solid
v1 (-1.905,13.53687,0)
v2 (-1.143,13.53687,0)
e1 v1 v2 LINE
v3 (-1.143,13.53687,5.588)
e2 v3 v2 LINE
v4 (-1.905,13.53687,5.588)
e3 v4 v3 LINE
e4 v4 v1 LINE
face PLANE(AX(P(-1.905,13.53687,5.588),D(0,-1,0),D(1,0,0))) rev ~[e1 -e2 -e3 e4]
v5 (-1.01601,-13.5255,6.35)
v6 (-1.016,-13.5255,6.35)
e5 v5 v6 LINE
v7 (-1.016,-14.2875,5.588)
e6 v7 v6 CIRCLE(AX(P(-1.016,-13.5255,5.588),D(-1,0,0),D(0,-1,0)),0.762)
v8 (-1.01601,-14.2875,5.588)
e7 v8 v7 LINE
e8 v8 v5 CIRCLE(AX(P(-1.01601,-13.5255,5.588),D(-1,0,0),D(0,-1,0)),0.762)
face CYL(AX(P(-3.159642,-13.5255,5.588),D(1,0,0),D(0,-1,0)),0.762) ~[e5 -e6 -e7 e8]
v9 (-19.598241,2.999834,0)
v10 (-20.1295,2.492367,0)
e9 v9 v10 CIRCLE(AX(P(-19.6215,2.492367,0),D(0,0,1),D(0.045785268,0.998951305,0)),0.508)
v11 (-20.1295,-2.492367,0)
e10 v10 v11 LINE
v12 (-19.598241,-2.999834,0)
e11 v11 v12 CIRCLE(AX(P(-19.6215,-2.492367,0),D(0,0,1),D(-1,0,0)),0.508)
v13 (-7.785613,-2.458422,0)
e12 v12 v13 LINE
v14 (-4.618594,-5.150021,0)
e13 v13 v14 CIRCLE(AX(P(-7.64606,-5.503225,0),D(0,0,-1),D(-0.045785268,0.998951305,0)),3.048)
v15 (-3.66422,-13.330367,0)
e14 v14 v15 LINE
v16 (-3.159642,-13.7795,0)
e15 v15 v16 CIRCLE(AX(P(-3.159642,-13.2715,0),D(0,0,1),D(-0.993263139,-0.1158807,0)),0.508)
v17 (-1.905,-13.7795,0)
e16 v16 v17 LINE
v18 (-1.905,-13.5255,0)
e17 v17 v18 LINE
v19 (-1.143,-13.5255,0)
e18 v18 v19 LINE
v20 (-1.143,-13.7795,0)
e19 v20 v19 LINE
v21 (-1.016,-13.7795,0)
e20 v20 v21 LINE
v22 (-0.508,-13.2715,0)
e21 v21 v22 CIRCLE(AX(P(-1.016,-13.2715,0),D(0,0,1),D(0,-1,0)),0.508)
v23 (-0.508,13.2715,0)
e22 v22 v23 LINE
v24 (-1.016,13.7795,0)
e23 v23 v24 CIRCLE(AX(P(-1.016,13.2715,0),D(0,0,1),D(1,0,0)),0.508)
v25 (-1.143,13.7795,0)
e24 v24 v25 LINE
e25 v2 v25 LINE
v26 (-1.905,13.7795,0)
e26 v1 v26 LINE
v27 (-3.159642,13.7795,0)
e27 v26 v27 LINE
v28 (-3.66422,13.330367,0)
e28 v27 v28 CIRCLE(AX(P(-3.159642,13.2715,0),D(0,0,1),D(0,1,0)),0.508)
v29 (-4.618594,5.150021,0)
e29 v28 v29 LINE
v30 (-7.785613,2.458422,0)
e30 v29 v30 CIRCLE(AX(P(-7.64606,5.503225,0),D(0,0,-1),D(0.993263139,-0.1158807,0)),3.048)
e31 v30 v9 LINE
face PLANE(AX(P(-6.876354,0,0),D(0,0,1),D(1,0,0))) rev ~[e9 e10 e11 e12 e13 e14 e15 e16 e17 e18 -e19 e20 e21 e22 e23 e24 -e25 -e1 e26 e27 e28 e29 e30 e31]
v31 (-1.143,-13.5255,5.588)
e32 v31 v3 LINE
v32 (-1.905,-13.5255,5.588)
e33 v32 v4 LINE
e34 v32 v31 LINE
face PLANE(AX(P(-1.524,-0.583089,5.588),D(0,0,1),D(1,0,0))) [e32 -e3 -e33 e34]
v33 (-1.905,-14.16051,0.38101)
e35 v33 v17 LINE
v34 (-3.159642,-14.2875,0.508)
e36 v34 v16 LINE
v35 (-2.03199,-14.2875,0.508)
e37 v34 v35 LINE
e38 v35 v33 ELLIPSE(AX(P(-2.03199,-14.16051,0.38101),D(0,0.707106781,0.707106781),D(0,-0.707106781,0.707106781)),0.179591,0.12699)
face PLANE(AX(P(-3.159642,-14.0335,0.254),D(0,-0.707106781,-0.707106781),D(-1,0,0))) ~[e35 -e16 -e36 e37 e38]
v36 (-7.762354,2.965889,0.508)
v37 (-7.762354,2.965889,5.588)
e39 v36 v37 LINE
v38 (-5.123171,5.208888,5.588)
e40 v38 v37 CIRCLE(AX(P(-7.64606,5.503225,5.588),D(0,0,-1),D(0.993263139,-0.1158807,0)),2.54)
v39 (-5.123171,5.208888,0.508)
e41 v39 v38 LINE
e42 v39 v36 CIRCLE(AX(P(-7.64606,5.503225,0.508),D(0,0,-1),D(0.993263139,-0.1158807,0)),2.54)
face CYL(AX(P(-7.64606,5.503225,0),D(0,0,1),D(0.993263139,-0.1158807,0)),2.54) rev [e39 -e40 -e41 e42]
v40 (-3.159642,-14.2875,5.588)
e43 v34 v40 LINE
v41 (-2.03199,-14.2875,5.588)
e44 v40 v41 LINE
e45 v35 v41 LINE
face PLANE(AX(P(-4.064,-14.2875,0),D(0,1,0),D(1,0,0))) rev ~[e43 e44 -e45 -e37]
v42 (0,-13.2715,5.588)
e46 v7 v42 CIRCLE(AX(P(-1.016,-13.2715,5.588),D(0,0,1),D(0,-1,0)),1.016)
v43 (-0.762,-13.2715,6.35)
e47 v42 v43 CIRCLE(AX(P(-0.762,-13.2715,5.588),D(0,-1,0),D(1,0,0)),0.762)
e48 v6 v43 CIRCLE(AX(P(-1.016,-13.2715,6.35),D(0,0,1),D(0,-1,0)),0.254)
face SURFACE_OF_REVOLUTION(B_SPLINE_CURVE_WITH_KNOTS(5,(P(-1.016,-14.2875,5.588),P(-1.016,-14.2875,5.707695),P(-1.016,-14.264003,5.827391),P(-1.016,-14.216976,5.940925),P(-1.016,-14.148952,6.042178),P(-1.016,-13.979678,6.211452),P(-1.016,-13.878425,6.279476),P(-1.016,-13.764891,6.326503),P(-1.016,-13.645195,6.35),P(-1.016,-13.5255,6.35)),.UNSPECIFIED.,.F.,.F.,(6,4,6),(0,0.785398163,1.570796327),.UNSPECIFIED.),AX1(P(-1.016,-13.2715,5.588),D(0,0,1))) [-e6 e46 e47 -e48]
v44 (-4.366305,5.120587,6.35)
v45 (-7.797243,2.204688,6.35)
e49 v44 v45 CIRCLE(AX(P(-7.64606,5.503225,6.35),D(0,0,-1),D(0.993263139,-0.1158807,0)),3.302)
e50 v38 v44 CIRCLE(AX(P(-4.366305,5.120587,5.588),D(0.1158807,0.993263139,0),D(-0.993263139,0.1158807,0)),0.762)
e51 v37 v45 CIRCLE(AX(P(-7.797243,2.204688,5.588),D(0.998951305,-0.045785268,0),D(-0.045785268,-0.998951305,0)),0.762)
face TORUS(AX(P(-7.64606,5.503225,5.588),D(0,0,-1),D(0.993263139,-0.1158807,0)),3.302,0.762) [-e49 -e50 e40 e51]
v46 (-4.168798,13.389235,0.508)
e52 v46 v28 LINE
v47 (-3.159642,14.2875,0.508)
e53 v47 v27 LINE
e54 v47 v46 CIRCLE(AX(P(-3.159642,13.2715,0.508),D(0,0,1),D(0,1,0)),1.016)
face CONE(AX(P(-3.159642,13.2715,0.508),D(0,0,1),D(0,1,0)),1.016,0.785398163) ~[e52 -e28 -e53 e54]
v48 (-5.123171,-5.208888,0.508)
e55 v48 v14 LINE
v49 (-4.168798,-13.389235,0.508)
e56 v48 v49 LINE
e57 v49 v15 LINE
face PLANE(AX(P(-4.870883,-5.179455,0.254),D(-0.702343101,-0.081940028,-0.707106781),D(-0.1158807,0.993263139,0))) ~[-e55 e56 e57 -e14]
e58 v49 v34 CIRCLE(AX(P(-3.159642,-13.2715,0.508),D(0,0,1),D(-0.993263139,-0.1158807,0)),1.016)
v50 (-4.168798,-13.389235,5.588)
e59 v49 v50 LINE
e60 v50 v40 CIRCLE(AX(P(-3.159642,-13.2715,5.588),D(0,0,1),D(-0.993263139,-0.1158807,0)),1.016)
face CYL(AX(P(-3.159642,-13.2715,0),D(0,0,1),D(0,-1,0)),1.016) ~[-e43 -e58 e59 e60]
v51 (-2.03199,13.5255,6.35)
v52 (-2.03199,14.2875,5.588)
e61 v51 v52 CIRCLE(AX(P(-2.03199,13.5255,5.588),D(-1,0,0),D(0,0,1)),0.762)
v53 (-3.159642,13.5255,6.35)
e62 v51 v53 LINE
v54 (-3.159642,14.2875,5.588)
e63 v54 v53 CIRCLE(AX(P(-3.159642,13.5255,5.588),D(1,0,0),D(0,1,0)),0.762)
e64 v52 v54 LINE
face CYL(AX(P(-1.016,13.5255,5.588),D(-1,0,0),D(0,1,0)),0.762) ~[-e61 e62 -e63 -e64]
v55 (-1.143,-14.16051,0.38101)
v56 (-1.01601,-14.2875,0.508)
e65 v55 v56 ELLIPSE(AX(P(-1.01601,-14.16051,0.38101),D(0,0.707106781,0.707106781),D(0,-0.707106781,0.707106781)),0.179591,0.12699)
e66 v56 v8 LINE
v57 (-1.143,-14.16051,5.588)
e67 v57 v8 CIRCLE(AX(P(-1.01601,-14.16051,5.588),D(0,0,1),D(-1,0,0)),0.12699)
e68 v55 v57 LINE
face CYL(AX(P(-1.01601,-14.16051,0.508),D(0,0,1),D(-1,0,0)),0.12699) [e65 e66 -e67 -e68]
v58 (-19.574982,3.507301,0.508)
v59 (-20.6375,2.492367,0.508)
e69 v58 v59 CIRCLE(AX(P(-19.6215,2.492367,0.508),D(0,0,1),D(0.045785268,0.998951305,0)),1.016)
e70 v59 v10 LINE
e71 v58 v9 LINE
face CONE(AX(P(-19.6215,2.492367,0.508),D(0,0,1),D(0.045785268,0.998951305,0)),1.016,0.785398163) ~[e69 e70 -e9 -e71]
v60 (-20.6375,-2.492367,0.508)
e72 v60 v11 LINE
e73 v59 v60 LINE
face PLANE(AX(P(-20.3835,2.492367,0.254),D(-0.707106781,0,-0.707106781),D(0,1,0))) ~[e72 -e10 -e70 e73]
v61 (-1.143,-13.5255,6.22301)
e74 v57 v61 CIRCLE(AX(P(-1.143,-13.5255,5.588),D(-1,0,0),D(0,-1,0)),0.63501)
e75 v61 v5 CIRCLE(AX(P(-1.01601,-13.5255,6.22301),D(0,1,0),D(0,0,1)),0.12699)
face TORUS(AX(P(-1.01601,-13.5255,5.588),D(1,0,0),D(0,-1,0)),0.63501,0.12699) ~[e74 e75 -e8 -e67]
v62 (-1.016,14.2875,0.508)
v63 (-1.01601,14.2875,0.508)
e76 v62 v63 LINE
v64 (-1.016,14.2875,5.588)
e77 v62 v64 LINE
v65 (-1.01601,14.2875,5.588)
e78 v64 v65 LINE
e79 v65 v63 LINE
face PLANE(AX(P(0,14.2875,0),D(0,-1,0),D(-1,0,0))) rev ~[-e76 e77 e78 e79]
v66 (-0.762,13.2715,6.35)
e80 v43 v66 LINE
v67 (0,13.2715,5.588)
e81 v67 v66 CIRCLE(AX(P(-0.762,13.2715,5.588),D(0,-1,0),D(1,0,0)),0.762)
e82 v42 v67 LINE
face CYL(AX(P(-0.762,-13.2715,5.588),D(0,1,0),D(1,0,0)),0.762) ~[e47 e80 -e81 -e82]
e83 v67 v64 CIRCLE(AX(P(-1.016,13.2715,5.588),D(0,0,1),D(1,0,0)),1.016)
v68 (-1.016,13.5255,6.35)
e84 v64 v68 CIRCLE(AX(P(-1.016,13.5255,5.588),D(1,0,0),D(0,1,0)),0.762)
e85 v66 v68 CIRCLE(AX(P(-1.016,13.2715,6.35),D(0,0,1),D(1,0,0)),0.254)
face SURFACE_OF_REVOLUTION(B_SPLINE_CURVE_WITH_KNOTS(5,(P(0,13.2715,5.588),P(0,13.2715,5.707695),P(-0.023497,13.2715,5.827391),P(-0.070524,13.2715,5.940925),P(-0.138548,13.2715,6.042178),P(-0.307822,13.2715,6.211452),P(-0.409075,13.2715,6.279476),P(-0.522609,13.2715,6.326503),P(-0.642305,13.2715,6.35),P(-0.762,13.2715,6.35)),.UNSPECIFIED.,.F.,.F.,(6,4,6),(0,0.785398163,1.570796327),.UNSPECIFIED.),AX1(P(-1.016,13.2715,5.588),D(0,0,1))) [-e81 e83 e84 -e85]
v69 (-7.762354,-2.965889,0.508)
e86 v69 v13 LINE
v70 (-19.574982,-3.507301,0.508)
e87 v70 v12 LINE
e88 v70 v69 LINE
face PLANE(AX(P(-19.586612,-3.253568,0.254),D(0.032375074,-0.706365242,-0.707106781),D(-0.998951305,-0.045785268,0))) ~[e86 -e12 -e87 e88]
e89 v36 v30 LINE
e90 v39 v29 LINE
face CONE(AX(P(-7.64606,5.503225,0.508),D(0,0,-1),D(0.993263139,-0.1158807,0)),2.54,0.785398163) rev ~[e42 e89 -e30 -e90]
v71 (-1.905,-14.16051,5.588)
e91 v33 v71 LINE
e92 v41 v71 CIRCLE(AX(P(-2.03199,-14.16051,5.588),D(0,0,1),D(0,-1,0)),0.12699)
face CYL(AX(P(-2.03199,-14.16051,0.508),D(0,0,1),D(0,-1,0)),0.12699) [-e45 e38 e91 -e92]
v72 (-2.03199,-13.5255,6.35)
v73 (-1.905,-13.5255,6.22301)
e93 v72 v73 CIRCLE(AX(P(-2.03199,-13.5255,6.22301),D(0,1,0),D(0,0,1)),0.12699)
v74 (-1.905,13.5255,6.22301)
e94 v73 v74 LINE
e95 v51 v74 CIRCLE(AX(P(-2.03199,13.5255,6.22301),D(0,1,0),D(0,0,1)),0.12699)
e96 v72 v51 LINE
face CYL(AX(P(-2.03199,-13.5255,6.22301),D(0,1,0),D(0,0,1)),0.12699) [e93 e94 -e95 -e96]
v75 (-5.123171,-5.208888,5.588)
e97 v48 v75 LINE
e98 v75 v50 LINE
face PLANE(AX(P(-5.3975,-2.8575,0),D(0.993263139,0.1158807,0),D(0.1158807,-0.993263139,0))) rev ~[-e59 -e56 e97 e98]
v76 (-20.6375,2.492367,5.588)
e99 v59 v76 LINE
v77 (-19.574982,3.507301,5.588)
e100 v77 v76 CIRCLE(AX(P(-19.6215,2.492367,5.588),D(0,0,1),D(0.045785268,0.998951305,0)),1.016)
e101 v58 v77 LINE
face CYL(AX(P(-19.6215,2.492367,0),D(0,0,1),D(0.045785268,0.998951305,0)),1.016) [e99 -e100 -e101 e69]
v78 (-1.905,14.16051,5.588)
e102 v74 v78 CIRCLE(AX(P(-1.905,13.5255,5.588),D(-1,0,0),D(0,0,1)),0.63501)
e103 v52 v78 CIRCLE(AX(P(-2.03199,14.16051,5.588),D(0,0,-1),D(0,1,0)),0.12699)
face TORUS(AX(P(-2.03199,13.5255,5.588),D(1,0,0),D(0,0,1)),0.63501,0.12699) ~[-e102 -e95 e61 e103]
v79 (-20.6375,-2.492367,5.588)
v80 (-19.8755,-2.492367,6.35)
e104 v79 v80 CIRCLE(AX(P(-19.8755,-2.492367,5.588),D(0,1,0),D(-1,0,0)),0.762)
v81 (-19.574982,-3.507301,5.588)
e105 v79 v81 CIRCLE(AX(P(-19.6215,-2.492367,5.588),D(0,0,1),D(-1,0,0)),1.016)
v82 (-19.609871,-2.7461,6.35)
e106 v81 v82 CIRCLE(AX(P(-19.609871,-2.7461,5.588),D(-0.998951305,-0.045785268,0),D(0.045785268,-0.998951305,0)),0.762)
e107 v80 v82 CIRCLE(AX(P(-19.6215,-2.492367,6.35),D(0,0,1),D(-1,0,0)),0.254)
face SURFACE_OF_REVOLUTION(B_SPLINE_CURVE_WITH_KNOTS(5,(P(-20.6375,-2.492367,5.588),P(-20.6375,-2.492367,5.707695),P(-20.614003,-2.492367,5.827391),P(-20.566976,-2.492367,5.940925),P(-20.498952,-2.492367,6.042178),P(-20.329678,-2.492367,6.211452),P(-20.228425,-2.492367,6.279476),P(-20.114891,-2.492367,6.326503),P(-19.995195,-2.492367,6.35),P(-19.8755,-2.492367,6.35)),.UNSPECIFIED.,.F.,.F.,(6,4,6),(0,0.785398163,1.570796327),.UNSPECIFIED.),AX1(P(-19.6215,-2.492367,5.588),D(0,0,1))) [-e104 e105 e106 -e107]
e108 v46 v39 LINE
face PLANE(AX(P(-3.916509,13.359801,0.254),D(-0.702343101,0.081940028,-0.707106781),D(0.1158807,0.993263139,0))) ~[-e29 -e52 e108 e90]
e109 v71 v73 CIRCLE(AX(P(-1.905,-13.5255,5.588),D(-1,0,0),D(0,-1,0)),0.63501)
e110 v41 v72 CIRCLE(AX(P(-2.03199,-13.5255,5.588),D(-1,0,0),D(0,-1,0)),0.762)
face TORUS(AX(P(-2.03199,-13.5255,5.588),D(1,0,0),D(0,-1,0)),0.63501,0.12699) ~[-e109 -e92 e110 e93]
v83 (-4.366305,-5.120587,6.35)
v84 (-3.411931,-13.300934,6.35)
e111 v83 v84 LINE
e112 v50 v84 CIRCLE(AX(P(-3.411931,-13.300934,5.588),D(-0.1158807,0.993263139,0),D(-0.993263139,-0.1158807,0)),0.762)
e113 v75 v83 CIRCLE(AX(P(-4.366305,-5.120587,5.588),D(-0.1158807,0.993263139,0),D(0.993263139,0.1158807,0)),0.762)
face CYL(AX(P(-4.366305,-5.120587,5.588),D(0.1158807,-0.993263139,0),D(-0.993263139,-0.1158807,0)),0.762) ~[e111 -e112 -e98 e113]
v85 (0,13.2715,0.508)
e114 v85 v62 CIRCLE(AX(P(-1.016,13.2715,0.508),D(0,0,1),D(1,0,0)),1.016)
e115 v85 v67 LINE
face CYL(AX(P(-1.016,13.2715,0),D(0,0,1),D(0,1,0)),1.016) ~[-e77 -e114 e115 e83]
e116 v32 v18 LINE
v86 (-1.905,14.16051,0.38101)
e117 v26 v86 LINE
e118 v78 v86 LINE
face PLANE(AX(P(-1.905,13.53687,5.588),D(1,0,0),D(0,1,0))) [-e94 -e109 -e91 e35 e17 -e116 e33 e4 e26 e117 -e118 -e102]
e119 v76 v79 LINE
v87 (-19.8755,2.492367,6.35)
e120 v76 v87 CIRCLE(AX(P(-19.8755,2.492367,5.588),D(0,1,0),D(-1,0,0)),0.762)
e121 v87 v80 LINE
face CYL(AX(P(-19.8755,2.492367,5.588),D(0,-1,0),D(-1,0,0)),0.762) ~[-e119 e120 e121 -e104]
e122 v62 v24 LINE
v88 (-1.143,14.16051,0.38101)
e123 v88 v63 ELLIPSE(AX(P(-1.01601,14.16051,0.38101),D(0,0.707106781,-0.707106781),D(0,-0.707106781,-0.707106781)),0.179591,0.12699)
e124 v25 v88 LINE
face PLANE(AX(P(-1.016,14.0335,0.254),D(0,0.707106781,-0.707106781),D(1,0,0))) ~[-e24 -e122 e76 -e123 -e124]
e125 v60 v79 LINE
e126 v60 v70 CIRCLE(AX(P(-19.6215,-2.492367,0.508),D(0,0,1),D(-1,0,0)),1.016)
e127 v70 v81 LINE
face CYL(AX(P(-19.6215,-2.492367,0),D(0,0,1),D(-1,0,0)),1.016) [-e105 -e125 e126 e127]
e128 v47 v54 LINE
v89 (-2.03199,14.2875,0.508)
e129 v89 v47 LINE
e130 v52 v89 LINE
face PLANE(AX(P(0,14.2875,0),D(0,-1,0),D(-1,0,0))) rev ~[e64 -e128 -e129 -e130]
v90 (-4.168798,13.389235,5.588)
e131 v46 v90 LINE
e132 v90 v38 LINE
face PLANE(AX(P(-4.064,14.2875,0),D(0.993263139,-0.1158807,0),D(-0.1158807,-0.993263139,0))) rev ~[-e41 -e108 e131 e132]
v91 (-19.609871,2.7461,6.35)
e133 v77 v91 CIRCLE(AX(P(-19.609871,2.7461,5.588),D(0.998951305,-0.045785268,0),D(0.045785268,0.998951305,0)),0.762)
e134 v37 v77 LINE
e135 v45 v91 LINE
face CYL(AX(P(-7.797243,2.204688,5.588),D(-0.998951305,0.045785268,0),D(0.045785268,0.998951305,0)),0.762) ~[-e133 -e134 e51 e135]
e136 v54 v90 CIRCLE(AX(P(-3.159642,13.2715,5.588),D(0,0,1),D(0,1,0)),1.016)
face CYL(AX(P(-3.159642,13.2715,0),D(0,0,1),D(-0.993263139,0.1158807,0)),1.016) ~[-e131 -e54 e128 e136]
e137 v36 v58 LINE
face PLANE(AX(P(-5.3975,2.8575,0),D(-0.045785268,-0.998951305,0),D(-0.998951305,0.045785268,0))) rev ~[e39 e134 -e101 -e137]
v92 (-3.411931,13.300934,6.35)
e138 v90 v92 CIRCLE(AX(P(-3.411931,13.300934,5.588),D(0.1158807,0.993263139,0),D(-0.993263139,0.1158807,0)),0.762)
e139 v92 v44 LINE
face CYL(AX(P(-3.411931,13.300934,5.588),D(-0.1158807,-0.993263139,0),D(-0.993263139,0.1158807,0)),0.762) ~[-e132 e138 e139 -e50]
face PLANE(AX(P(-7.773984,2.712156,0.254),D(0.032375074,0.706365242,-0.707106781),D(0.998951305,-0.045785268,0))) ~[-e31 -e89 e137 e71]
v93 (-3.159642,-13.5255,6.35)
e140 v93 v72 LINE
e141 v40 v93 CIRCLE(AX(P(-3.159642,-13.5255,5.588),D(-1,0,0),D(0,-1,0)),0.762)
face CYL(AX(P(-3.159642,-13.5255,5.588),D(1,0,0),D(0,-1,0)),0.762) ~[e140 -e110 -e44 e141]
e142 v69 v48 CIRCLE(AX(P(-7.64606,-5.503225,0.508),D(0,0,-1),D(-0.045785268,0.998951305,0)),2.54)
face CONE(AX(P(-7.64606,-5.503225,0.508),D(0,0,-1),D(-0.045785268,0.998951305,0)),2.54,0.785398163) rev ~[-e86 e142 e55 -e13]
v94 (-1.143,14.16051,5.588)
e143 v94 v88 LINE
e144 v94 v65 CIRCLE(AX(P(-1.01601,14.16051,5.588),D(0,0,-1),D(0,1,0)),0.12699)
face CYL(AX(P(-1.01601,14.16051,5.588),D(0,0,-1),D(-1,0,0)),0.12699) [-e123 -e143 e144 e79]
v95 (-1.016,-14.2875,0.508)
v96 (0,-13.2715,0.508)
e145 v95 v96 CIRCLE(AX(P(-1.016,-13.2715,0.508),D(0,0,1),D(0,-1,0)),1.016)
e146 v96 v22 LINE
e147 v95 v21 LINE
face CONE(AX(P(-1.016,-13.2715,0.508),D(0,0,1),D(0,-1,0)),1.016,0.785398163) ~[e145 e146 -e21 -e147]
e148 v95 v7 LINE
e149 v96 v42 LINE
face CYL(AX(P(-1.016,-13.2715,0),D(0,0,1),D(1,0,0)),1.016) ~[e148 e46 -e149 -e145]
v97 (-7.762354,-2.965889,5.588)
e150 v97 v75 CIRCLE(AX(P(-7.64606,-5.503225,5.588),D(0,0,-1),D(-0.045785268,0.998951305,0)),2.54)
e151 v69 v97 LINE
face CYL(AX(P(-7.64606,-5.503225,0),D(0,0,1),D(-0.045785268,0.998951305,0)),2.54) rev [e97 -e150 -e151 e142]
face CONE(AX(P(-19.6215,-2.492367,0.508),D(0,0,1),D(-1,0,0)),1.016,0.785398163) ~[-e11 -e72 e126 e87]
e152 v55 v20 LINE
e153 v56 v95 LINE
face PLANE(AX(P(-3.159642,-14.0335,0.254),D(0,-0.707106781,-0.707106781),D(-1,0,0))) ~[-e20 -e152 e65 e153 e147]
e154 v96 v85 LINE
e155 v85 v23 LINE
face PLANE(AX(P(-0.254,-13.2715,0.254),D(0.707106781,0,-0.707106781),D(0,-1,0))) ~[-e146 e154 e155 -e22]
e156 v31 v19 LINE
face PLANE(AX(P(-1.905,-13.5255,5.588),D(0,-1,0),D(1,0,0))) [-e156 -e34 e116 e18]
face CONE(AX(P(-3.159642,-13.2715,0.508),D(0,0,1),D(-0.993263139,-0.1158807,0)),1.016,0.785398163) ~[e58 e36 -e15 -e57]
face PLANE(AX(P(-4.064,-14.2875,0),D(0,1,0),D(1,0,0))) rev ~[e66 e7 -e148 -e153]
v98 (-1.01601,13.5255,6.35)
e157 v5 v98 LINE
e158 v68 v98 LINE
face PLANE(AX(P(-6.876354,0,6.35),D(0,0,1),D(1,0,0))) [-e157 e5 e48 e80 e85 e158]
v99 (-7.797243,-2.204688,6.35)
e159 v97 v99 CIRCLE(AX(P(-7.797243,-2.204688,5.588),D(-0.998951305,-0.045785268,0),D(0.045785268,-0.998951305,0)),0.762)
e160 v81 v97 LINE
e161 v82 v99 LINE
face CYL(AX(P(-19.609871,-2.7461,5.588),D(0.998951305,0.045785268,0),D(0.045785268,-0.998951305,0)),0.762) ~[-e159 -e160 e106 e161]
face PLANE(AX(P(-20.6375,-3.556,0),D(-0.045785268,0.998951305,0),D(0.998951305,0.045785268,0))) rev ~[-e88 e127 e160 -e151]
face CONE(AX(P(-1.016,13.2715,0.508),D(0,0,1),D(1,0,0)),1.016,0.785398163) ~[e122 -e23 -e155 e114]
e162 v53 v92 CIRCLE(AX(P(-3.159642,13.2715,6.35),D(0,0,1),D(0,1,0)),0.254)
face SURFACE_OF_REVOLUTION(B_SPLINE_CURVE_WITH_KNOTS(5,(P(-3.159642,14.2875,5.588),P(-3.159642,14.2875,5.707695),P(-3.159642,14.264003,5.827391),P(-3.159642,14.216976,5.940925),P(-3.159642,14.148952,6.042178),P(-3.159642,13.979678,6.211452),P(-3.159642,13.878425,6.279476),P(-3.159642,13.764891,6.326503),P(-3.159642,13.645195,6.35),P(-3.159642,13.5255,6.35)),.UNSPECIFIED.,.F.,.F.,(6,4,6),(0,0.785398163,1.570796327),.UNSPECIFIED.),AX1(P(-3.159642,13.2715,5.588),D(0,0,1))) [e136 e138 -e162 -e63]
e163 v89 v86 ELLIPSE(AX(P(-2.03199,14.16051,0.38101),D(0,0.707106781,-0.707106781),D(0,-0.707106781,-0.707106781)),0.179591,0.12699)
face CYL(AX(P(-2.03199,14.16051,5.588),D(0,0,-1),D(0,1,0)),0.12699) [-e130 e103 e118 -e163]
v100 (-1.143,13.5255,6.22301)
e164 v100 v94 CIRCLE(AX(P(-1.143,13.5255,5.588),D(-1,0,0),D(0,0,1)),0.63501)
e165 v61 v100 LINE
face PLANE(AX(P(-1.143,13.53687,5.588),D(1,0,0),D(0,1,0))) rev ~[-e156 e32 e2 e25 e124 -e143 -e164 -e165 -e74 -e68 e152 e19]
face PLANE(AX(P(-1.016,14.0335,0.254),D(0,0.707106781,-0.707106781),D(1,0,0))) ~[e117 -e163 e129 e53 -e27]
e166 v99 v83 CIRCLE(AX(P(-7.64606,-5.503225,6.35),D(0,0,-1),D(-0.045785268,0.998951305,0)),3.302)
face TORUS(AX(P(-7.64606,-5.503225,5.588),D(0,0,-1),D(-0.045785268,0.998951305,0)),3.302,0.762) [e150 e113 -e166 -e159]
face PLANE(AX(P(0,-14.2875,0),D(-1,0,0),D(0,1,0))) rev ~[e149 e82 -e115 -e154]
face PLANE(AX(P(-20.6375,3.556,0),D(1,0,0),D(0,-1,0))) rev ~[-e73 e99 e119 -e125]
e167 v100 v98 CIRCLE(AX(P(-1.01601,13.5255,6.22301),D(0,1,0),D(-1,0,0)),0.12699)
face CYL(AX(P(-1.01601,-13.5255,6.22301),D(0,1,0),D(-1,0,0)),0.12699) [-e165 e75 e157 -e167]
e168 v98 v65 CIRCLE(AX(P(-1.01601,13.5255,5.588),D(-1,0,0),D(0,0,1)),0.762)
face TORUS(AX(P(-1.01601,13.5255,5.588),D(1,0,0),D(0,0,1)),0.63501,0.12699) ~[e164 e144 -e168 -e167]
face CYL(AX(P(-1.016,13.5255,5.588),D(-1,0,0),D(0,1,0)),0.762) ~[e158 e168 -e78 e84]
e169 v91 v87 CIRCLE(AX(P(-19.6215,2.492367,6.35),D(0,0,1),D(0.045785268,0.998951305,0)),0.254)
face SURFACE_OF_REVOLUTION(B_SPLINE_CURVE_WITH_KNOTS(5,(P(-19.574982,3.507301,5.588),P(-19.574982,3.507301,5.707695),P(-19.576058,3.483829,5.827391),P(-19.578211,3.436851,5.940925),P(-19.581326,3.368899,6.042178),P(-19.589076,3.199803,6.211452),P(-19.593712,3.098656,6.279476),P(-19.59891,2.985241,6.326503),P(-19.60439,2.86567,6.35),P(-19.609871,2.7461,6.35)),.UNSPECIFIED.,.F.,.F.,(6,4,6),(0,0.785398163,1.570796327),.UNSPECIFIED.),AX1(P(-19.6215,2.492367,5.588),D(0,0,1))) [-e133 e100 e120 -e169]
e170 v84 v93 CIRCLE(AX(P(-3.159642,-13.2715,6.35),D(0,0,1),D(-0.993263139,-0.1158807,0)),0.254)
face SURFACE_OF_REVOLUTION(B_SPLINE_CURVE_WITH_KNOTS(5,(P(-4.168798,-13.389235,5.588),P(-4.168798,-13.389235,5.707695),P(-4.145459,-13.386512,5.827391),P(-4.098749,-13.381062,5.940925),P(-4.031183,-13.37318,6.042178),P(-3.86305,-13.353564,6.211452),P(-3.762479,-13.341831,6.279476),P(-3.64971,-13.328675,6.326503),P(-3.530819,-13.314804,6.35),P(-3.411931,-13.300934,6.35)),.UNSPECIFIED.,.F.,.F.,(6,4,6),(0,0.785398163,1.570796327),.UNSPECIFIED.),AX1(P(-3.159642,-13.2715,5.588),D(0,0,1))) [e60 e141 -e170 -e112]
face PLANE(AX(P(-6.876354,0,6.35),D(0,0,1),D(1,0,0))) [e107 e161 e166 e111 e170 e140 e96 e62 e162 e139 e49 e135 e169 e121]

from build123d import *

# Parameters (mm, degrees)
F1_DEPTH = 6.35
F2_R     = 2.54
F3_R     = 1.016
F4_R     = 0.762
F5_SIZE  = 0.508
F6_W     = 0.762
F6_H     = 31.75
F7_DEPTH = 0.762
F8_W     = 0.762
F8_H     = 0.7506295204
F8_H_2   = 0.762
F9_DEPTH = 25.4
F10_R    = 0.12699


# Not quite as in the source:
# - a fillet or chamfer is up to 0.001 mm smaller than in the source, because OpenCascade refuses the exact size


with BuildPart() as f1:
    # F0 (on Top) → F1 (new body)
    with BuildSketch(Plane.XY):
        Polygon((0, -14.2875), (0, 14.2875), (-4.064, 14.2875), (-5.3975, 2.8575), (-20.6375, 3.556), (-20.6375, -3.556), (-5.3975, -2.8575), (-4.064, -14.2875), align=None)
    extrude(amount=F1_DEPTH)

    # F2
    f2_edges = [f1.edges().sort_by_distance(p)[0] for p in [
        (-5.3975, -2.8575, 3.175),
        (-5.3975, 2.8575, 3.175),
    ]]
    fillet(f2_edges, radius=F2_R)

    # F3
    f3_edges = [f1.edges().sort_by_distance(p)[0] for p in [
        (0, 14.2875, 3.175),
        (-4.064, 14.2875, 3.175),
        (0, -14.2875, 3.175),
        (-4.064, -14.2875, 3.175),
        (-20.6375, 3.556, 3.175),
        (-20.6375, -3.556, 3.175),
    ]]
    fillet(f3_edges, radius=F3_R)

    # F4
    f4_edges = [f1.edges().sort_by_distance(p)[0] for p in [
        (-4.645984, 9.299062, 6.35),
        (-3.835156, 14.030405, 6.35),
        (-6.001163, 3.567789, 6.35),
        (-2.087821, 14.2875, 6.35),
        (-13.668668, 3.236595, 6.35),
        (-0.29758, 13.98992, 6.35),
        (-20.323281, 3.22705, 6.35),
        (0, 0, 6.35),
        (-20.6375, 0, 6.35),
        (-0.29758, -13.98992, 6.35),
        (-20.323281, -3.22705, 6.35),
        (-2.087821, -14.2875, 6.35),
        (-13.668668, -3.236595, 6.35),
        (-3.835156, -14.030405, 6.35),
        (-6.001163, -3.567789, 6.35),
        (-4.645984, -9.299062, 6.35),
    ]]
    fillet(f4_edges, radius=F4_R)

    # F5
    f5_edges = [f1.edges().sort_by_distance(p)[0] for p in [
        (-4.645984, 9.299062, 0),
        (-3.835156, 14.030405, 0),
        (-6.001163, 3.567789, 0),
        (-2.087821, 14.2875, 0),
        (-13.668668, 3.236595, 0),
        (-0.29758, 13.98992, 0),
        (-20.323281, 3.22705, 0),
        (0, 0, 0),
        (-20.6375, 0, 0),
        (-0.29758, -13.98992, 0),
        (-20.323281, -3.22705, 0),
        (-2.087821, -14.2875, 0),
        (-13.668668, -3.236595, 0),
        (-3.835156, -14.030405, 0),
        (-6.001163, -3.567789, 0),
        (-4.645984, -9.299062, 0),
    ]]
    chamfer(f5_edges, length=F5_SIZE)

    # F6 (on face) → F7 (cut)
    with BuildSketch(Plane.XY.offset(6.35)):
        with Locations((-1.524, -0.5830885321)):
            Rectangle(F6_W, F6_H)
    extrude(amount=-F7_DEPTH, mode=Mode.SUBTRACT)

    # F8 (on face) → F9 (cut)
    with BuildSketch(Plane.XY.offset(5.588)):
        with Locations((-1.524, 13.9121852398)):
            Rectangle(F8_W, F8_H)
        with Locations((-1.524, -13.9065)):
            Rectangle(F8_W, F8_H_2)
    extrude(amount=-F9_DEPTH, mode=Mode.SUBTRACT)

    # F10 (radius 0.127 in the source; OpenCascade refuses exactly that, so slightly less here)
    f10_edges = [f1.edges().sort_by_distance(p)[0] for p in [
        (-1.143, 0, 6.35),
        (-1.905, 0, 6.35),
    ]]
    fillet(f10_edges, radius=F10_R)


solid = f1.part
